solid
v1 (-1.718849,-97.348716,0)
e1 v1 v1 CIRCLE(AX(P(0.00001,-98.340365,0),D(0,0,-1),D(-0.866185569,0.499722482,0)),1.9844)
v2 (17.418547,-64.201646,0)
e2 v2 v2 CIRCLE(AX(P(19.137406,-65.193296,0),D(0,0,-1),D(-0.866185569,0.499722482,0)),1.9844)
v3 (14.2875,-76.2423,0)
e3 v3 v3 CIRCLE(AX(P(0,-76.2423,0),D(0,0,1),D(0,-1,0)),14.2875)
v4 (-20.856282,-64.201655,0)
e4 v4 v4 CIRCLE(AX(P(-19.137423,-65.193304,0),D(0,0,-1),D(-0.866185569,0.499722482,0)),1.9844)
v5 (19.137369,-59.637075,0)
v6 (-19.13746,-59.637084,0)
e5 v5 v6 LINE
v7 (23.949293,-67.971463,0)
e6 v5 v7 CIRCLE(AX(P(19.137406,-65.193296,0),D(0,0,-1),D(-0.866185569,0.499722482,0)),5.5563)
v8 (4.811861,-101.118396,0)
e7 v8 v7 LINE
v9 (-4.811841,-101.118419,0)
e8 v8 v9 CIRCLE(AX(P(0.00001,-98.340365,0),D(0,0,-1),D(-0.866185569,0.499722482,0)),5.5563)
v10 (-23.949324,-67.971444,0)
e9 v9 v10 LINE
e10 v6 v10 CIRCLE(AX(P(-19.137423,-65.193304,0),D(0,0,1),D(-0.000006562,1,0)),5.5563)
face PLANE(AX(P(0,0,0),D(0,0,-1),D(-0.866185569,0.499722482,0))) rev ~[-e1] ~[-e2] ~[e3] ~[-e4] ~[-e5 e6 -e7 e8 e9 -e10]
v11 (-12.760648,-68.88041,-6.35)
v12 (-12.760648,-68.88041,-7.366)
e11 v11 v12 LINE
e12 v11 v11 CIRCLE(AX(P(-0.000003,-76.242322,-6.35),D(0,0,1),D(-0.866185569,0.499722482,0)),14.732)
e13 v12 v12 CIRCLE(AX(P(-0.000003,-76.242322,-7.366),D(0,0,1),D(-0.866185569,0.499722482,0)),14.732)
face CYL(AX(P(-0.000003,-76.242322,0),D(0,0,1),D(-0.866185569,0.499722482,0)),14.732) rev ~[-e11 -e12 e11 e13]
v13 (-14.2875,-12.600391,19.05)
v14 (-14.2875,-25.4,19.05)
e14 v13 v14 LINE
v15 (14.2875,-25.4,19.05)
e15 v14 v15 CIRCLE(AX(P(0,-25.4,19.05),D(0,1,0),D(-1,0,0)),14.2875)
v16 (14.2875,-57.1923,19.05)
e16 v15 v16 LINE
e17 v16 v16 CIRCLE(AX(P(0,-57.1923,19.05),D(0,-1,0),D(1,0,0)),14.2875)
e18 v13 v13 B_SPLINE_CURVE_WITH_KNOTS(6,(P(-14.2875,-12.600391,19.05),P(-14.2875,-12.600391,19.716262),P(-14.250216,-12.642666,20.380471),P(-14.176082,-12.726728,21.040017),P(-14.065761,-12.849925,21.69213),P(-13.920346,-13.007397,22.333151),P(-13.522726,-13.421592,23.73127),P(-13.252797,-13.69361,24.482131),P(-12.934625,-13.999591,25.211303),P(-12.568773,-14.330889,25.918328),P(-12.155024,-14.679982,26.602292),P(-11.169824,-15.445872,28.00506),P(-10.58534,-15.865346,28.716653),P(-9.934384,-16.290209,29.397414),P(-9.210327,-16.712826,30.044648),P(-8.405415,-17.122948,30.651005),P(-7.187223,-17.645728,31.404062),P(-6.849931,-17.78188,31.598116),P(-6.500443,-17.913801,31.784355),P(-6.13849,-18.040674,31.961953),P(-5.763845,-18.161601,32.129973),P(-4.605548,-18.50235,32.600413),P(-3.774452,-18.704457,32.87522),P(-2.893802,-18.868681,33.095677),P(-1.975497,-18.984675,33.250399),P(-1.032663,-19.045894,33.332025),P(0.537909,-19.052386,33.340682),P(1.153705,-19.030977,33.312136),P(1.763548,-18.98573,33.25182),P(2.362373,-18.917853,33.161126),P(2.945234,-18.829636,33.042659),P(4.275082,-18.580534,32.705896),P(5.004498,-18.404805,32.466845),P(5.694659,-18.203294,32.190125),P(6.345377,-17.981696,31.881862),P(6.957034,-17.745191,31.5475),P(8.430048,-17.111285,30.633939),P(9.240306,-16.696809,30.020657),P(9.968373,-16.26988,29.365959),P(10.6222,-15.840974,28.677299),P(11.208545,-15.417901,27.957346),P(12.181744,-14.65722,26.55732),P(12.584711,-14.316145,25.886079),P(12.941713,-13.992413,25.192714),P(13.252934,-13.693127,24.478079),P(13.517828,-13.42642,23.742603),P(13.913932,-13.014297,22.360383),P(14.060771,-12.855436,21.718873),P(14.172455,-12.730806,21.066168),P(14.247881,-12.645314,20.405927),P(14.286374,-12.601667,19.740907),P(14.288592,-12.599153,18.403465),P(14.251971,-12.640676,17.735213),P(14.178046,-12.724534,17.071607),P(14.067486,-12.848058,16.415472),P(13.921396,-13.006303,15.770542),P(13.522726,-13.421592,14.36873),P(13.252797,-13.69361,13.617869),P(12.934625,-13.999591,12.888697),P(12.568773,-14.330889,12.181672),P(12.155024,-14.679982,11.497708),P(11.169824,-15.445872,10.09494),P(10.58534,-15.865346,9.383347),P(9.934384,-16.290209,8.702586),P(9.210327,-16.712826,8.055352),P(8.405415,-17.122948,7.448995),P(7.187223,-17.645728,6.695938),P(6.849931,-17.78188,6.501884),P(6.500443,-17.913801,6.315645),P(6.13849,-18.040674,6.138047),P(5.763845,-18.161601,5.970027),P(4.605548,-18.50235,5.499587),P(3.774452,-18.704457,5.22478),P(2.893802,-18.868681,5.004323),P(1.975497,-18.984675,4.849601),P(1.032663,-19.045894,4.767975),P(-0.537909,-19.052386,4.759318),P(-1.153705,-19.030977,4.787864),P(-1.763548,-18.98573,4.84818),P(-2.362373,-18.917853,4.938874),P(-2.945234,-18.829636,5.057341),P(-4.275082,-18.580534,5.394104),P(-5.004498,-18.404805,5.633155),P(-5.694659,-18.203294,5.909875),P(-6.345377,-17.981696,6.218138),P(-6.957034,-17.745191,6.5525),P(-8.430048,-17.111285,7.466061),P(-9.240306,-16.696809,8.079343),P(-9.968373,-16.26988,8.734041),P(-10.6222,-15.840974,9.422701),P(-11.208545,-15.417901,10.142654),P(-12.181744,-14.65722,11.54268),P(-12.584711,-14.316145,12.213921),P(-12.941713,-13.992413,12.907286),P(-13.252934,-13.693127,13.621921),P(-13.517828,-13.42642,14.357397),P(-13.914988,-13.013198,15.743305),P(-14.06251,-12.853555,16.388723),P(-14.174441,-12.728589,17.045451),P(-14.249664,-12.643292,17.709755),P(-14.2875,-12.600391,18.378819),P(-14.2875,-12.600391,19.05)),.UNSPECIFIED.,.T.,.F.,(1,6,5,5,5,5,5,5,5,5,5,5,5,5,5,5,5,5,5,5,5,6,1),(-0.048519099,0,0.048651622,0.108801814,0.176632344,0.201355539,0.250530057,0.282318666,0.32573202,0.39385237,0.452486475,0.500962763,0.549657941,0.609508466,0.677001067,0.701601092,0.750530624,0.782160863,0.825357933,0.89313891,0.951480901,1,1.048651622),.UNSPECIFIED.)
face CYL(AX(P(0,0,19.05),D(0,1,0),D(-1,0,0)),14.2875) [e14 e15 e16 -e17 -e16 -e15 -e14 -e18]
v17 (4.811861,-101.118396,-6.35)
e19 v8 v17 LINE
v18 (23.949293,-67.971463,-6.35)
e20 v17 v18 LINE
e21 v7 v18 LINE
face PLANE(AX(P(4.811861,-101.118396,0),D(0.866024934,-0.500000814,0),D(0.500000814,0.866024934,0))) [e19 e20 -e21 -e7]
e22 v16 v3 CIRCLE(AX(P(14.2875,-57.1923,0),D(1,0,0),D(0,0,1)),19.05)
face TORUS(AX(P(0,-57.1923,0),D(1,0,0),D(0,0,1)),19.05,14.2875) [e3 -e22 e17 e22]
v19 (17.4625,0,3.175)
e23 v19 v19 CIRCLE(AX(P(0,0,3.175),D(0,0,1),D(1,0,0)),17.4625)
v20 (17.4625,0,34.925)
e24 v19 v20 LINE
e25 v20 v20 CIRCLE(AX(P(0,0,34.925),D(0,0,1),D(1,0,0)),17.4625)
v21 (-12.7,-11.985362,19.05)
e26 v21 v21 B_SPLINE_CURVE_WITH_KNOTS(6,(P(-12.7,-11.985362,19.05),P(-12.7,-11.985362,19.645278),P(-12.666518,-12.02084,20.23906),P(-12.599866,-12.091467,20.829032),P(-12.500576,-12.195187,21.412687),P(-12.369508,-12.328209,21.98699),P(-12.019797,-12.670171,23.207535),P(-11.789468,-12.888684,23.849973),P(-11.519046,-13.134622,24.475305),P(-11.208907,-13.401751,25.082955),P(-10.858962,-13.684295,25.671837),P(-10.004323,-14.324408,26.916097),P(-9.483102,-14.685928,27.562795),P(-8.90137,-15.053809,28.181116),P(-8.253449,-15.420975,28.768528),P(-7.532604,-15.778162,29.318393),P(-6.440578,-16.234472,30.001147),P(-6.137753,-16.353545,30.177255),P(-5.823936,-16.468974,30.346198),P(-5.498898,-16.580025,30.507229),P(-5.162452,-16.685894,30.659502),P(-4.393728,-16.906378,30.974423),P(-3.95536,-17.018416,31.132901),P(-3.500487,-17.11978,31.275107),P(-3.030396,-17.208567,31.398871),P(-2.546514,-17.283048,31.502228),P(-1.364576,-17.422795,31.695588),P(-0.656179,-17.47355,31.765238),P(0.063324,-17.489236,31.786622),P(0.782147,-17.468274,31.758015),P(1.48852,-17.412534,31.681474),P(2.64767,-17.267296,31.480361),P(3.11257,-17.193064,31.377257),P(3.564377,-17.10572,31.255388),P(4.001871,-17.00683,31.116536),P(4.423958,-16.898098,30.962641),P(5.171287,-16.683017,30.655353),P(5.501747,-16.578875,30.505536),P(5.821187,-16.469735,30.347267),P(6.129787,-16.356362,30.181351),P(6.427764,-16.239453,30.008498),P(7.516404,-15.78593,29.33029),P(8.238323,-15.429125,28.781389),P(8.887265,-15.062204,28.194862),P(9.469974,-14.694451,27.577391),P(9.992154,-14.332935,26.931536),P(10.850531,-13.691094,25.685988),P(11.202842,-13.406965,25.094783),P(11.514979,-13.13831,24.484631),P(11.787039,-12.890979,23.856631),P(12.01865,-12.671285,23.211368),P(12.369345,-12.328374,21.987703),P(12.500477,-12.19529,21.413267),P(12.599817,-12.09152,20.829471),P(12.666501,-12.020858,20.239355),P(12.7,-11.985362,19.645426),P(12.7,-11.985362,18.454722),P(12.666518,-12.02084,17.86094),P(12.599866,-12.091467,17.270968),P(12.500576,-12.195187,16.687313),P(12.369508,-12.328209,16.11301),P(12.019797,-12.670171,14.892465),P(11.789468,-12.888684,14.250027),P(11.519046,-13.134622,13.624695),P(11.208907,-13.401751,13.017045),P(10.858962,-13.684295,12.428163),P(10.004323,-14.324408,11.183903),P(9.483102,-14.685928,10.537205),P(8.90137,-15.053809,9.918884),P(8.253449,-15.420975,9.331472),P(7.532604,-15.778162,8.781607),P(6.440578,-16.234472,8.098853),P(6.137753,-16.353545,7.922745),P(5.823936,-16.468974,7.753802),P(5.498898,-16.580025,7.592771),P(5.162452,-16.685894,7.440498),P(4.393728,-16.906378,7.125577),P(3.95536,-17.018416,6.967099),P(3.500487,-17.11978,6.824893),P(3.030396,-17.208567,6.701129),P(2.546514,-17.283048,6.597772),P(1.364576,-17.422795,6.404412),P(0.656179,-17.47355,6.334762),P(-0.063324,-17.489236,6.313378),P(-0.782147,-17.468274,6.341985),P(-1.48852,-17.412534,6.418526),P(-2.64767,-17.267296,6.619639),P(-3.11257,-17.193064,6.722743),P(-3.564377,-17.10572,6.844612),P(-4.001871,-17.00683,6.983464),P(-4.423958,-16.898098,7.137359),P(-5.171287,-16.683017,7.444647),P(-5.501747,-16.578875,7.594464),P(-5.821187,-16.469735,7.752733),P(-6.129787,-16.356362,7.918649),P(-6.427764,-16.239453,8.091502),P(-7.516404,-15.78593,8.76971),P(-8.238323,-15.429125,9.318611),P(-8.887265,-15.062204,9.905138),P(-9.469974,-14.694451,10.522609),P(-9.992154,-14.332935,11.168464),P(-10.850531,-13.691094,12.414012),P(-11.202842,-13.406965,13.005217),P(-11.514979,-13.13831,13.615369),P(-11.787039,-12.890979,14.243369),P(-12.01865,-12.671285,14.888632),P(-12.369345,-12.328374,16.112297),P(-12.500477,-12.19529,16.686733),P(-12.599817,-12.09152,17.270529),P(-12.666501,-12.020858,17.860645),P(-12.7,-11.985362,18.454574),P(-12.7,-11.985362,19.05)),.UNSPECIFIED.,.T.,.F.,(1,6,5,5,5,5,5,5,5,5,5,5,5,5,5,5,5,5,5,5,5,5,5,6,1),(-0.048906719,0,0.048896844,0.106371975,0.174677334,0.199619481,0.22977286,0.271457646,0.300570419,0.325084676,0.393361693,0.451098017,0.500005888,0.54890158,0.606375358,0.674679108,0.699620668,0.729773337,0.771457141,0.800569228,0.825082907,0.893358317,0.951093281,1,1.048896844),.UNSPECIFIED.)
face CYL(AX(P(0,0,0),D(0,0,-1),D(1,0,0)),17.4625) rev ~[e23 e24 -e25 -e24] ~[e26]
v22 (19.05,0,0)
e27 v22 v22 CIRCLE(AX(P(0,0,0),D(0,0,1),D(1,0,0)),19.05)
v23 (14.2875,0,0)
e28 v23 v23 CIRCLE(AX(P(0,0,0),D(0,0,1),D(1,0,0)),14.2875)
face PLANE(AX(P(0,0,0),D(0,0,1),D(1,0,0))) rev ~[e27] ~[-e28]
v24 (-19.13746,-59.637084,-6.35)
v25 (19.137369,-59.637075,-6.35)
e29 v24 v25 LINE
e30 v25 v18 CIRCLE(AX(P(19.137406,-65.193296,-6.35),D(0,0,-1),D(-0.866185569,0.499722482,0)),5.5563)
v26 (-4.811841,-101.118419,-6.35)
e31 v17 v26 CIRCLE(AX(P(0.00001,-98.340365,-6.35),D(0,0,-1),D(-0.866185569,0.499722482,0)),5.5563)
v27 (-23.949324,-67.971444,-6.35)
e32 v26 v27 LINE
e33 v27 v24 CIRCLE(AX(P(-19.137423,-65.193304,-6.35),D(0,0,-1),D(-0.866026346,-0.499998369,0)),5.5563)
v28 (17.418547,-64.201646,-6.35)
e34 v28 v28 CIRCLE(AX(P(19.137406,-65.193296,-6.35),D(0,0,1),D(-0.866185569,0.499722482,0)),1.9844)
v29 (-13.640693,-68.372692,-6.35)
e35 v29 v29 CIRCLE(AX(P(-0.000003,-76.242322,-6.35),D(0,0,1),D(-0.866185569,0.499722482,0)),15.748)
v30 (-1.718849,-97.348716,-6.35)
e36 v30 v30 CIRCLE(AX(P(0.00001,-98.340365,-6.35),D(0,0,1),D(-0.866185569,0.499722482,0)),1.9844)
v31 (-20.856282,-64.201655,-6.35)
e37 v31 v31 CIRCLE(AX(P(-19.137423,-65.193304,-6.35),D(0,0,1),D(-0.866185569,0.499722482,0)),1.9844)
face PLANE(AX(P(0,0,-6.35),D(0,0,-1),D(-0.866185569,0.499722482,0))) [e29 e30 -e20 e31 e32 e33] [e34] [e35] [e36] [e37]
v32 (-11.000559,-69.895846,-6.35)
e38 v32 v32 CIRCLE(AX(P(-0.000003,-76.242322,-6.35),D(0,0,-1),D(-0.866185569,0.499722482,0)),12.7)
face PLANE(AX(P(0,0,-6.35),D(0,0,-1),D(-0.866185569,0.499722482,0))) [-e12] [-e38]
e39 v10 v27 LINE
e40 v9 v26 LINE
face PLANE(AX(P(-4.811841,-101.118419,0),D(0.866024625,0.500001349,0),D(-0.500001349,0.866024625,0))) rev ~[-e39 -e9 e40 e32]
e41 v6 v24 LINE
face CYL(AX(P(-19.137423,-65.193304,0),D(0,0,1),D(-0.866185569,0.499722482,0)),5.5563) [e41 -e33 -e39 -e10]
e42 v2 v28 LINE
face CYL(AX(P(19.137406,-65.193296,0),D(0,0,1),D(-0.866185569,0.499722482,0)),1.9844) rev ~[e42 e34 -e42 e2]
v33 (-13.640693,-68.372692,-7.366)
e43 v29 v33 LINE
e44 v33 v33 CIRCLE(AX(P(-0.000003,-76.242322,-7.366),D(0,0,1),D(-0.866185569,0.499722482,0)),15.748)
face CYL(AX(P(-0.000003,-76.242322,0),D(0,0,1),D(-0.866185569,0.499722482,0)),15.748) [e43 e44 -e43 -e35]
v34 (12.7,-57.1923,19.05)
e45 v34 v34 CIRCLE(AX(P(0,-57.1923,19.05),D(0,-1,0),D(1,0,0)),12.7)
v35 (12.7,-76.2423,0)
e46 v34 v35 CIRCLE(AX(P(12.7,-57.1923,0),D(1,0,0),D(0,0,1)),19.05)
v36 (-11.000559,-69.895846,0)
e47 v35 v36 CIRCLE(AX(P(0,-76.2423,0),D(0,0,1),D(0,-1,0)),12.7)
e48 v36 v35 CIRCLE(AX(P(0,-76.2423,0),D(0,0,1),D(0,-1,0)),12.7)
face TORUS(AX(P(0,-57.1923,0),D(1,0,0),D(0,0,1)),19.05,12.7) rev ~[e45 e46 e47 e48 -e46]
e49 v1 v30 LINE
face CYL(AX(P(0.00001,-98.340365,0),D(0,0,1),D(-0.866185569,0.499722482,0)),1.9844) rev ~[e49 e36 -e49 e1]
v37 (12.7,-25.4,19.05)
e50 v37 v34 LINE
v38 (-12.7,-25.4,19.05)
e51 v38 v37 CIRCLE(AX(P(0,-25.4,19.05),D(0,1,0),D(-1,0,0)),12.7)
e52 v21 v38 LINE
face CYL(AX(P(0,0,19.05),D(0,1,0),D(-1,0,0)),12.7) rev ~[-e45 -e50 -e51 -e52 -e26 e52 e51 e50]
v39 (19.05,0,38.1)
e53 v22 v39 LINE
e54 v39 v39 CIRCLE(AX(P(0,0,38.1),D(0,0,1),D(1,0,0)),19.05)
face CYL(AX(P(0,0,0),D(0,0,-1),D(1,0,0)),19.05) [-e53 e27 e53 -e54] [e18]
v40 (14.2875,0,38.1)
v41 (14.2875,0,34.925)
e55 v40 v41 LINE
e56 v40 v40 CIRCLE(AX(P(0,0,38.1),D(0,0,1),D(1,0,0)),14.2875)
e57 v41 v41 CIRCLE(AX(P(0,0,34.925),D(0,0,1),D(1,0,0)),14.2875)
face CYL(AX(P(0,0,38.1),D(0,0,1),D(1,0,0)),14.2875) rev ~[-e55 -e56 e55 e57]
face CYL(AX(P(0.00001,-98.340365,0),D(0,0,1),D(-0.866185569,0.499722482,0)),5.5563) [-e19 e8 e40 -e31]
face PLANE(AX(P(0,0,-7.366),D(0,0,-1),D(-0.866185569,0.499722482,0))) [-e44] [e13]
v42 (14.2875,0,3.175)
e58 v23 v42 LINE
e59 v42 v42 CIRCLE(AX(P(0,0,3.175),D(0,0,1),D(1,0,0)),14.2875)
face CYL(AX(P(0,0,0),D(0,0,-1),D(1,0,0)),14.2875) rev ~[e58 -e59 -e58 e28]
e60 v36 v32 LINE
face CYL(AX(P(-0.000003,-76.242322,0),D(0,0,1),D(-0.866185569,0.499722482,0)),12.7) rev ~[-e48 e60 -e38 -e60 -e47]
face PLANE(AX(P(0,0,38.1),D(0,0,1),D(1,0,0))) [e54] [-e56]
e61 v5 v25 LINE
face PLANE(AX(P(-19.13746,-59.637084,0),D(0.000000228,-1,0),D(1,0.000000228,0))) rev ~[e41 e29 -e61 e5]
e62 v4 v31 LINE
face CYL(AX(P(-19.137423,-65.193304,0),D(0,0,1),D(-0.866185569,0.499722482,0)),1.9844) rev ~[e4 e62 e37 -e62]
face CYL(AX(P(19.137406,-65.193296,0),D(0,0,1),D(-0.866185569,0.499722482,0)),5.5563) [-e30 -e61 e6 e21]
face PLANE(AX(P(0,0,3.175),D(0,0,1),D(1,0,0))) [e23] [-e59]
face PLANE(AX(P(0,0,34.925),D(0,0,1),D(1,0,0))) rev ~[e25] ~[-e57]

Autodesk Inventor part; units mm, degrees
ref_plane "YZ Plane" through (0, 0, 0) normal (1, 0, 0) x (0, 1, 0)
ref_plane "XZ Plane" through (0, 0, 0) normal (0, 1, 0) x (-1, 0, 0)
sketch "Sketch1" plane through (0, 0, 0) normal (0, 0, 1) x (1, 0, 0)
  circle A0 centre (0, 0) radius 14.2875
  circle A1 centre (0, 0) radius 17.4625
  circle A2 centre (0, 0) radius 19.05
  dimension "d0" = 28.575
  dimension "d1" = 34.925
  dimension "d2" = 38.1
extrude "Extrusion1" add sketch "Sketch1" along normal blind 38.1 contours A0 | A1 | A2
sketch "Sketch11" plane through (0, 0, 0) normal (0, 0, 1) x (1, 0, 0)
  circle A0 centre (0, 0) radius 25.908
  circle A1 centre (-38.1, -66.04) radius 12.7
  circle A2 centre (-38.1, -66.04) radius 14.732
  circle A3 centre (-38.1, -66.04) radius 15.748
  line L0 (-38.1, -66.04) -> (-49.1429, -85.181)
  line L1 (-38.1, -66.04) -> (0, 0)
  line L2 (-38.1, -66.04) -> (-49.1551, -46.9061)
  line L3 (-38.1, -66.04) -> (-16.002, -66.0329)
  circle A4 centre (-49.1429, -85.181) radius 1.9844
  circle A5 centre (-49.1551, -46.9061) radius 1.9844
  circle A6 centre (-16.002, -66.0329) radius 1.9844
  circle A7 centre (-16.002, -66.0329) radius 5.5563
  circle A8 centre (-49.1429, -85.181) radius 5.5563
  circle A9 centre (-49.1551, -46.9061) radius 5.5563
  line L4 (-54.6991, -85.1827) -> (-54.7114, -46.9079)
  line L5 (-46.3632, -89.9919) -> (-13.2223, -70.8439)
  line L6 (-13.2254, -61.2202) -> (-46.3785, -42.0934)
  line L7 (0, 0) -> (0, -25.908)
  circle A10 centre (16.002, -66.0329) radius 1.9844
  circle A11 centre (49.1551, -46.9061) radius 1.9844
  circle A12 centre (49.1429, -85.181) radius 1.9844
  line L8 (0, 0) -> (-41.3682, 23.8663)
  line L9 (0, 0) -> (24.0327, 41.6566)
  line L10 (0, 0) -> (61.3648, -35.4028)
  dimension "d137" = 51.816
  dimension "d154" = 0
  dimension "d155" = 360
  dimension "d138" = 38.1
  dimension "d139" = 66.04
  dimension "d140" = 25.4
  dimension "d141" = 29.464
  dimension "d142" = 31.496
  dimension "d143" = 22.098
  dimension "d144" = 120
  dimension "d145" = 120
  dimension "d146" = 22.098
  dimension "d147" = 22.098
  dimension "d148" = 3.9688
  dimension "d149" = 3.9688
  dimension "d150" = 3.9688
  dimension "d151" = 11.1125
  dimension "d152" = 11.1125
  dimension "d153" = 11.1125
  dimension "d159" = 90
  dimension "d160" = 90
  dimension "d161" = 180
ref_plane "Work Plane8" through (0, 0, 0) normal (0, 0, -1) x (-0.8661856, 0.4997225, 0)
sketch "Sketch12" plane through (0, 0, 0) normal (0, 0, -1) x (-0.8661856, 0.4997225, 0)
  circle A0 centre (0, 0) radius 25.908
  circle A1 centre (-38.1, -66.04) radius 12.7
  circle A2 centre (-38.1, -66.04) radius 14.732
  circle A3 centre (-38.1, -66.04) radius 15.748
  line L0 (-38.1, -66.04) -> (-49.1429, -85.181)
  line L1 (-38.1, -66.04) -> (0, 0)
  line L2 (-38.1, -66.04) -> (-49.1551, -46.9061)
  line L3 (-38.1, -66.04) -> (-16.002, -66.0329)
  circle A4 centre (-49.1429, -85.181) radius 1.9844
  circle A5 centre (-49.1551, -46.9061) radius 1.9844
  circle A6 centre (-16.002, -66.0329) radius 1.9844
  circle A7 centre (-16.002, -66.0329) radius 5.5563
  circle A8 centre (-49.1429, -85.181) radius 5.5563
  circle A9 centre (-49.1551, -46.9061) radius 5.5563
  line L4 (-54.6991, -85.1827) -> (-54.7114, -46.9079)
  line L5 (-46.3632, -89.9919) -> (-13.2223, -70.8439)
  line L6 (-13.2254, -61.2202) -> (-46.3785, -42.0934)
  line L7 (0, 0) -> (0, -25.908)
  circle A10 centre (16.002, -66.0329) radius 1.9844
  circle A11 centre (49.1551, -46.9061) radius 1.9844
  circle A12 centre (49.1429, -85.181) radius 1.9844
  dimension "d162" = 51.816
  dimension "d179" = 0
  dimension "d180" = 360
  dimension "d163" = 38.1
  dimension "d164" = 66.04
  dimension "d165" = 25.4
  dimension "d166" = 29.464
  dimension "d167" = 31.496
  dimension "d168" = 22.098
  dimension "d169" = 120
  dimension "d170" = 120
  dimension "d171" = 22.098
  dimension "d172" = 22.098
  dimension "d173" = 3.9688
  dimension "d174" = 3.9688
  dimension "d175" = 3.9688
  dimension "d176" = 11.1125
  dimension "d177" = 11.1125
  dimension "d178" = 11.1125
sketch "Sketch13" plane through (0, 0, 0) normal (0, 1, 0) x (-1, 0, 0)
  line L0 (0, 0) -> (0, 19.05)
  circle A0 centre (0, 19.05) radius 14.2875
  circle A1 centre (0, 19.05) radius 12.7
  dimension "d184" = 19.05
  dimension "d185" = 28.575
  dimension "d186" = 25.4
extrude "Extrusion4" add sketch "Sketch13" against normal blind 25.4 contours A0 | A1
shell "Shell1" thickness 1.5875 removed faces 3 at (-5.6226, 0.0883, 38.1) at (-5.6226, 0.0883, 0) at (-3.9719, -25.4, 19.2449)
extrude "Extrusion5" add sketch "Sketch1" along normal blind 3.175 contours A1
sketch "Sketch14" plane through (0, 0, 38.1) normal (0, 0, 1) x (1, 0, 0)
  circle A0 centre (0, 0) radius 14.2875
  circle A1 centre (0, 0) radius 17.4625
  circle A2 centre (0, 0) radius 19.05
  dimension "d192" = 28.575
  dimension "d193" = 34.925
  dimension "d194" = 38.1
extrude "Extrusion6" add sketch "Sketch14" against normal blind 3.175 contours A1
sketch "Sketch15" plane through (0, -25.4, 19.05) normal (0, -1, 0) x (1, 0, 0)
  circle A0 centre (0, 0) radius 12.7
  circle A1 centre (0, 0) radius 14.2875
  point P0 (0, -19.05)
  dimension "d199" = 25.4
  dimension "d200" = 28.575
sketch3d "3D Sketch4"
  line L0 (0, -25.4, 19.05) -> (0, -57.1923, 19.05)
  arc A0 (0, -57.1923, 19.05) -> (0, -76.2423, 0) centre (0, -57.1923, 0) ccw
  dimension "d198" = 19.05
sweep "Sweep1" add profiles "Sketch15" path "3D Sketch4"
extrude "Extrusion7" add sketch "Sketch12" along normal blind 6.35 contours A1 L3 A2 L0 | A1 L1 A2 L3 | L0 A2 L2 A1 | A1 L2 A2 L1 | L3 A3 L0 A2 | A2 L1 A3 L3 | L0 A3 L2 A2 | A2 L2 A3 L1 | L3 A7 L5 A8 L0 A3 | A3 L1 L6 A7 L3 | L0 A8 L4 A9 L2 A3 | A3 L2 A9 L6 L1 | A7 | A8 | A9
extrude "Extrusion8" add sketch "Sketch12" along normal blind 7.366 contours L3 A3 L0 A2 | A2 L1 A3 L3 | L0 A3 L2 A2 | A2 L2 A3 L1
equation "\"d3\" = 9.525 * scale"
equation "\"d138\" = 9.525 * d156"
equation "\"d139\" = 16.51 * d156"
equation "\"d140\" = 6.35 * d156"
equation "\"d163\" = 9.525 * d181"
equation "\"d164\" = 16.51 * d181"
equation "\"d165\" = 6.35 * d181"
equation "\"d36\" = 3.175"
equation "\"d59\" = 3.175"
equation "\"d82\" = 3.175"
equation "\"d104\" = 3.175"
equation "\"d127\" = 3.175"
equation "\"d158\" = 3.175"
equation "\"d183\" = 3.175"
equation "\"scale\" = 4"
equation "\"d156\" = 4"
equation "\"d181\" = 4"
properties part number "Intake_Manifold_2" material "Aluminum 6061"
